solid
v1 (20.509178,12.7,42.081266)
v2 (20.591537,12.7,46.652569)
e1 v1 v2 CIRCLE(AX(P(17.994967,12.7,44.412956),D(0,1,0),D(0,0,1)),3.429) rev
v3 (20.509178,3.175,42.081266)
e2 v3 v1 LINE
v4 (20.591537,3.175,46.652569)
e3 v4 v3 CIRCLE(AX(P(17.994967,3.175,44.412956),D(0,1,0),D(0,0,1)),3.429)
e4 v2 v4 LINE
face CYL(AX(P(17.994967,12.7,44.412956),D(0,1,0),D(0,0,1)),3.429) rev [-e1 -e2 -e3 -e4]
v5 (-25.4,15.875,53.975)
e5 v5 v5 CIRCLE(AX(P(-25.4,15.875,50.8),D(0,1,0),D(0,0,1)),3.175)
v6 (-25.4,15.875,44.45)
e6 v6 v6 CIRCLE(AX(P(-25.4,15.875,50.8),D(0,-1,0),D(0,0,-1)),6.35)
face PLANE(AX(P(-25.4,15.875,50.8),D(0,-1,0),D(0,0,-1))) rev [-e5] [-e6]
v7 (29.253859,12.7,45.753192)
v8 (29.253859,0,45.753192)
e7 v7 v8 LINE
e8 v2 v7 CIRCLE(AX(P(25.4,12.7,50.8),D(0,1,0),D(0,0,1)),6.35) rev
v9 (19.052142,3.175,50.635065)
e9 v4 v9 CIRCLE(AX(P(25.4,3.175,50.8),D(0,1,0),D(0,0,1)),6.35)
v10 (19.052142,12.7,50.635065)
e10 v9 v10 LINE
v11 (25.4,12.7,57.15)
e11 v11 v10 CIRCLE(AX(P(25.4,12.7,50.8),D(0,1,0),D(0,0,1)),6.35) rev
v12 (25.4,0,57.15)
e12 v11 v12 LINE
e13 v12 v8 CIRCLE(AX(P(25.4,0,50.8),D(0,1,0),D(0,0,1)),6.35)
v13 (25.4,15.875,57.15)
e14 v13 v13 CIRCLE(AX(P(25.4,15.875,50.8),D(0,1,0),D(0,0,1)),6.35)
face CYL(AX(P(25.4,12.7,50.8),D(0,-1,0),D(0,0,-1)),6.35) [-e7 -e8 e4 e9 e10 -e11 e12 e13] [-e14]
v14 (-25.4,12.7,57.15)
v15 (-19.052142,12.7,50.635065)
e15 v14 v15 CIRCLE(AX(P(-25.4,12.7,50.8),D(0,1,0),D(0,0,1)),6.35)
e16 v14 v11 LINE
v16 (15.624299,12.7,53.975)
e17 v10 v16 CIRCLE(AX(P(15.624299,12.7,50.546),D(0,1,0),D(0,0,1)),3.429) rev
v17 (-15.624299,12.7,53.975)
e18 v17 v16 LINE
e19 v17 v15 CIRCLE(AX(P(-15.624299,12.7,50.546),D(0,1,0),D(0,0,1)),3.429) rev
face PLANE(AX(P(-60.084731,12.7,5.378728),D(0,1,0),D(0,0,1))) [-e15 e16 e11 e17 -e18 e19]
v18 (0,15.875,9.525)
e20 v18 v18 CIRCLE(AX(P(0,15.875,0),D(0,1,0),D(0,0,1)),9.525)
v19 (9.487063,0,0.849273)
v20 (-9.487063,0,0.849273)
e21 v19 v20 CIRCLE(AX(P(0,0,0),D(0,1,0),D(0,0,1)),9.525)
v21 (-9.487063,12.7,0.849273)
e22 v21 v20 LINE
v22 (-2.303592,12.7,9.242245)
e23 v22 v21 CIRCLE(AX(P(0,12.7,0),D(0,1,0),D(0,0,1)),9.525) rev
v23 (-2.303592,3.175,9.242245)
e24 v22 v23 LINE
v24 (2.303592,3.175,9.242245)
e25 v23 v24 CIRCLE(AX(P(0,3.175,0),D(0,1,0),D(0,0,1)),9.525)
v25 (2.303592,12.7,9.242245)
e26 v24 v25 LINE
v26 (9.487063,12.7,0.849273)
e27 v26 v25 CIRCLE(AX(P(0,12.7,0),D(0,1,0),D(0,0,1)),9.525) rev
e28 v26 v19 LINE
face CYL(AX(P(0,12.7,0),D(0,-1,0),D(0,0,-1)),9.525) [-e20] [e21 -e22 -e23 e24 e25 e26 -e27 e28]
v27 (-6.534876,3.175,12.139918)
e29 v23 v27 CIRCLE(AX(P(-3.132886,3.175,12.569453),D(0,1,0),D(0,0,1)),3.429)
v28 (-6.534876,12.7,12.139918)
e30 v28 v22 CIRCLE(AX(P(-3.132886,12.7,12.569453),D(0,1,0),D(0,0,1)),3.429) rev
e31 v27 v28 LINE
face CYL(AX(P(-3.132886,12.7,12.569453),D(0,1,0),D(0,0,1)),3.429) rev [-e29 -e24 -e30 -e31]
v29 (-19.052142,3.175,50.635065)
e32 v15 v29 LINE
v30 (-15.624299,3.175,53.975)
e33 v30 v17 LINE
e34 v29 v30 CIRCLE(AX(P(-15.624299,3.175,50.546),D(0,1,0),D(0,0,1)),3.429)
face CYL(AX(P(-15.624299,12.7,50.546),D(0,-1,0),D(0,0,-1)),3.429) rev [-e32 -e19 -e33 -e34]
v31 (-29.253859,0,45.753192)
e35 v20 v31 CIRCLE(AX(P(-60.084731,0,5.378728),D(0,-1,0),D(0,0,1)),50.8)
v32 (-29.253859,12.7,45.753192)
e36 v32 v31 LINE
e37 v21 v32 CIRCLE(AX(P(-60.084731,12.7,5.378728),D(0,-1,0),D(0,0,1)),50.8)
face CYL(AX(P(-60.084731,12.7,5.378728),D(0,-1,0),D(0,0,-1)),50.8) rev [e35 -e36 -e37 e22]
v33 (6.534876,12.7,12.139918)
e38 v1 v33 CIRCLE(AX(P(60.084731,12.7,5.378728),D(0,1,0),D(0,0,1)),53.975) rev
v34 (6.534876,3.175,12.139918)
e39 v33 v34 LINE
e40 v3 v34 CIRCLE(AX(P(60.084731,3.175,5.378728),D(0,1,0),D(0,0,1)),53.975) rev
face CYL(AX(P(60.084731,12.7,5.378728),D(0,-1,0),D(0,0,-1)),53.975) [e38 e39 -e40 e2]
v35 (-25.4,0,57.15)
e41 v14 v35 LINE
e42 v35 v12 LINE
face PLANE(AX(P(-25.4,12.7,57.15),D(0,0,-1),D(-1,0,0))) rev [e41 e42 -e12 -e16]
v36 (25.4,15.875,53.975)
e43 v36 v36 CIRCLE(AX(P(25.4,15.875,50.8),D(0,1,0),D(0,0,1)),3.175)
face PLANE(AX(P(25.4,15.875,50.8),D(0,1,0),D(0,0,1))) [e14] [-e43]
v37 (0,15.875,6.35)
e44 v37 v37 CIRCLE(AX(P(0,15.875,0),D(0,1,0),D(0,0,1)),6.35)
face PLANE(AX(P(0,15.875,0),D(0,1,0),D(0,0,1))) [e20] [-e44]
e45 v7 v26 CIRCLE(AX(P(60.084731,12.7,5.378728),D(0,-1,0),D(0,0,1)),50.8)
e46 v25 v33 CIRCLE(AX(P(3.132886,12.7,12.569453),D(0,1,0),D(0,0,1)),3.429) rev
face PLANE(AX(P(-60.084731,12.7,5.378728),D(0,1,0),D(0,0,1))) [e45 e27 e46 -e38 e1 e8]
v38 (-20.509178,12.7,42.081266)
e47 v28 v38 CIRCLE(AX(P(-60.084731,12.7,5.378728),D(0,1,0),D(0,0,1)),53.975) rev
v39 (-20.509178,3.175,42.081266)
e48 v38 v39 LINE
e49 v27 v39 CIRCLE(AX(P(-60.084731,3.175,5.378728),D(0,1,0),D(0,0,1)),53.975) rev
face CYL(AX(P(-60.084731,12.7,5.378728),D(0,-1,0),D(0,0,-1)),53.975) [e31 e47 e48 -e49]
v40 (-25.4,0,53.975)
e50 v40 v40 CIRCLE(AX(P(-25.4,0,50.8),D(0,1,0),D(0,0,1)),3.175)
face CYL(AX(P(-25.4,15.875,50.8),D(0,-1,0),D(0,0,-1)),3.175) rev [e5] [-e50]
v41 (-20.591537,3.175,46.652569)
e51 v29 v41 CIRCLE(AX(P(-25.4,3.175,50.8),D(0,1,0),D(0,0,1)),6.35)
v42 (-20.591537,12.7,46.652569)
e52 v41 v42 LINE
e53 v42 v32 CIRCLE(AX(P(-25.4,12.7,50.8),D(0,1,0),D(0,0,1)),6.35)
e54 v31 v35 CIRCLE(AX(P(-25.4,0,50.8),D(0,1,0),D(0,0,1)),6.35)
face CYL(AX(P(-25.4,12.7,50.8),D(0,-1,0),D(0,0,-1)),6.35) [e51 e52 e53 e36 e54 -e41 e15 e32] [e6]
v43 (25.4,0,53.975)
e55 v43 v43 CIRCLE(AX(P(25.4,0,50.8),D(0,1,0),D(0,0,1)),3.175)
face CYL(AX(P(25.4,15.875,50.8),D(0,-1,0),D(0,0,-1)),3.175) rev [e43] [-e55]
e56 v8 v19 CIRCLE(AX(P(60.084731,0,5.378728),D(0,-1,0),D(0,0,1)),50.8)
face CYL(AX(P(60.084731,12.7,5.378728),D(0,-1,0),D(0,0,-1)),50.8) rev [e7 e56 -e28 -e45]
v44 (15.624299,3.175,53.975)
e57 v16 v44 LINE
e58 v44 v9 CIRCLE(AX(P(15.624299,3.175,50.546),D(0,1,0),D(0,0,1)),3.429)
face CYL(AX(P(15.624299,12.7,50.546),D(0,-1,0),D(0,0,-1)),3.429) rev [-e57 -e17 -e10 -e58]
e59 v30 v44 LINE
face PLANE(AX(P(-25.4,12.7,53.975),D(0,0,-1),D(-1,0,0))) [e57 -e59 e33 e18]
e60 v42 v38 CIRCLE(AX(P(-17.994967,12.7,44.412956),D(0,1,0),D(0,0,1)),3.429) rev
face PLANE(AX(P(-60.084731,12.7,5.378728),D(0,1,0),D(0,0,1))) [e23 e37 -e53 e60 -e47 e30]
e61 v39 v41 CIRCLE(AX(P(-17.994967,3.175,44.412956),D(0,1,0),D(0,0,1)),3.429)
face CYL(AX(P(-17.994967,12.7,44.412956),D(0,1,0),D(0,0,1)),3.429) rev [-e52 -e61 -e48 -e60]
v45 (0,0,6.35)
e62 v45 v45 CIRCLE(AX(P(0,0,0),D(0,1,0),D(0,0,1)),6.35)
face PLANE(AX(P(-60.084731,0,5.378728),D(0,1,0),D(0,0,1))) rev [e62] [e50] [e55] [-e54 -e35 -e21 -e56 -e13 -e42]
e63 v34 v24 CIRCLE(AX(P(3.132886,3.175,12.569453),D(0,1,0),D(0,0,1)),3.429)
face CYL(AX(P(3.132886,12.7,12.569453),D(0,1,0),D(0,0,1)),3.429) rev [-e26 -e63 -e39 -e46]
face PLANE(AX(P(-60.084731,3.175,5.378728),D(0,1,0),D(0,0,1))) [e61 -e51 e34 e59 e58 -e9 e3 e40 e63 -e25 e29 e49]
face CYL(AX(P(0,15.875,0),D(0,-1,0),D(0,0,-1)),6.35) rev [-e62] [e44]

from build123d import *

# Parameters (mm, degrees)
BOSS_EXTRUDE1_DEPTH = 12.7
OUTSIDE_CIRLCES_R   = 9.525
OUTSIDE_CIRLCES_R_2 = 6.35
BOSS_EXTRUDE2_DEPTH = 15.875
SKETCH2_R           = 6.35
SKETCH2_R_2         = 3.175
CUT_EXTRUDE2_DEPTH  = 68.277043819
SHELL1_START        = 3.175
SHELL1_DEPTH        = 9.525
FILLET1_R           = 3.429


# Read off the part's stored shape, not the designer's step: Shell1
with BuildPart() as part:
    # Sketch1 → Boss-Extrude1 (new body)
    with BuildSketch(Plane(origin=(0, 0, 0), x_dir=(1, 0, 0), z_dir=(0, 1, 0))):
        with BuildLine():
            Line((-25.4, -57.15), (25.4, -57.15))
            ThreePointArc((25.4, -57.15), (31.415385717, -52.834117665), (29.253859008, -45.753192024))
            ThreePointArc((29.253859008, -45.753192024), (13.590190704, -25.845719106), (9.487062801, -0.849272876))
            ThreePointArc((9.487062801, -0.849272876), (0, 9.525), (-9.487062801, -0.849272876))
            ThreePointArc((-9.487062801, -0.849272876), (-13.590190704, -25.845719106), (-29.253859008, -45.753192024))
            ThreePointArc((-29.253859008, -45.753192024), (-31.415385717, -52.834117665), (-25.4, -57.15))
        make_face()
    extrude(amount=BOSS_EXTRUDE1_DEPTH)

    # Outside Cirlces → Boss-Extrude2 (add)
    with BuildSketch(Plane(origin=(0, 0, 0), x_dir=(1, 0, 0), z_dir=(0, 1, 0))):
        with Locations(Location((0, 0, 0), (0, 0, 354.884571445))):
            Circle(OUTSIDE_CIRLCES_R)
        with Locations(Location((25.4, -50.8, 0), (0, 0, 270))):
            Circle(OUTSIDE_CIRLCES_R_2)
        with Locations(Location((-25.4, -50.8, 0), (0, 0, 90))):
            Circle(OUTSIDE_CIRLCES_R_2)
    extrude(amount=BOSS_EXTRUDE2_DEPTH)

    # Sketch2 → Cut-Extrude2 (cut, through all)
    with BuildSketch(Plane(origin=(0, 0, 0), x_dir=(1, 0, 0), z_dir=(0, 1, 0))):
        with Locations(Location((0, 0, 0), (0, 0, 270))):
            Circle(SKETCH2_R)
        with Locations(Location((-25.4, -50.8, 0), (0, 0, 270))):
            Circle(SKETCH2_R_2)
        with Locations(Location((25.4, -50.8, 0), (0, 0, 270))):
            Circle(SKETCH2_R_2)
    extrude(amount=CUT_EXTRUDE2_DEPTH, mode=Mode.SUBTRACT)

    # Shell1 outline → Shell1 (cut)
    with BuildSketch(Plane(origin=(0, 0, 0), x_dir=(1, 0, 0), z_dir=(0, 1, 0)).offset(SHELL1_START)):
        with BuildLine():
            ThreePointArc((-23.245193613, -44.826783996), (-19.436053982, -48.61966794), (-19.900738686, -53.975))
            Line((-19.900738686, -53.975), (19.900738686, -53.975))
            ThreePointArc((19.900738686, -53.975), (19.436053982, -48.61966794), (23.245193613, -44.826783996))
            ThreePointArc((23.245193613, -44.826783996), (10.964919098, -27.751584466), (6.1431994, -7.279198179))
            ThreePointArc((6.1431994, -7.279198179), (0, -9.525), (-6.1431994, -7.279198179))
            ThreePointArc((-6.1431994, -7.279198179), (-10.964919098, -27.751584466), (-23.245193613, -44.826783996))
        make_face()
    extrude(amount=SHELL1_DEPTH, mode=Mode.SUBTRACT)

    # Fillet1
    fillet1_edges = [part.edges().sort_by_distance(p)[0] for p in [
        (-6.1431994, 7.9375, 7.279198179),
        (-19.900738686, 7.9375, 53.975),
        (23.245193613, 7.9375, 44.826783996),
        (6.1431994, 7.9375, 7.279198179),
        (-23.245193613, 7.9375, 44.826783996),
        (19.900738686, 7.9375, 53.975),
    ]]
    fillet(fillet1_edges, radius=FILLET1_R)


solid = part.part
